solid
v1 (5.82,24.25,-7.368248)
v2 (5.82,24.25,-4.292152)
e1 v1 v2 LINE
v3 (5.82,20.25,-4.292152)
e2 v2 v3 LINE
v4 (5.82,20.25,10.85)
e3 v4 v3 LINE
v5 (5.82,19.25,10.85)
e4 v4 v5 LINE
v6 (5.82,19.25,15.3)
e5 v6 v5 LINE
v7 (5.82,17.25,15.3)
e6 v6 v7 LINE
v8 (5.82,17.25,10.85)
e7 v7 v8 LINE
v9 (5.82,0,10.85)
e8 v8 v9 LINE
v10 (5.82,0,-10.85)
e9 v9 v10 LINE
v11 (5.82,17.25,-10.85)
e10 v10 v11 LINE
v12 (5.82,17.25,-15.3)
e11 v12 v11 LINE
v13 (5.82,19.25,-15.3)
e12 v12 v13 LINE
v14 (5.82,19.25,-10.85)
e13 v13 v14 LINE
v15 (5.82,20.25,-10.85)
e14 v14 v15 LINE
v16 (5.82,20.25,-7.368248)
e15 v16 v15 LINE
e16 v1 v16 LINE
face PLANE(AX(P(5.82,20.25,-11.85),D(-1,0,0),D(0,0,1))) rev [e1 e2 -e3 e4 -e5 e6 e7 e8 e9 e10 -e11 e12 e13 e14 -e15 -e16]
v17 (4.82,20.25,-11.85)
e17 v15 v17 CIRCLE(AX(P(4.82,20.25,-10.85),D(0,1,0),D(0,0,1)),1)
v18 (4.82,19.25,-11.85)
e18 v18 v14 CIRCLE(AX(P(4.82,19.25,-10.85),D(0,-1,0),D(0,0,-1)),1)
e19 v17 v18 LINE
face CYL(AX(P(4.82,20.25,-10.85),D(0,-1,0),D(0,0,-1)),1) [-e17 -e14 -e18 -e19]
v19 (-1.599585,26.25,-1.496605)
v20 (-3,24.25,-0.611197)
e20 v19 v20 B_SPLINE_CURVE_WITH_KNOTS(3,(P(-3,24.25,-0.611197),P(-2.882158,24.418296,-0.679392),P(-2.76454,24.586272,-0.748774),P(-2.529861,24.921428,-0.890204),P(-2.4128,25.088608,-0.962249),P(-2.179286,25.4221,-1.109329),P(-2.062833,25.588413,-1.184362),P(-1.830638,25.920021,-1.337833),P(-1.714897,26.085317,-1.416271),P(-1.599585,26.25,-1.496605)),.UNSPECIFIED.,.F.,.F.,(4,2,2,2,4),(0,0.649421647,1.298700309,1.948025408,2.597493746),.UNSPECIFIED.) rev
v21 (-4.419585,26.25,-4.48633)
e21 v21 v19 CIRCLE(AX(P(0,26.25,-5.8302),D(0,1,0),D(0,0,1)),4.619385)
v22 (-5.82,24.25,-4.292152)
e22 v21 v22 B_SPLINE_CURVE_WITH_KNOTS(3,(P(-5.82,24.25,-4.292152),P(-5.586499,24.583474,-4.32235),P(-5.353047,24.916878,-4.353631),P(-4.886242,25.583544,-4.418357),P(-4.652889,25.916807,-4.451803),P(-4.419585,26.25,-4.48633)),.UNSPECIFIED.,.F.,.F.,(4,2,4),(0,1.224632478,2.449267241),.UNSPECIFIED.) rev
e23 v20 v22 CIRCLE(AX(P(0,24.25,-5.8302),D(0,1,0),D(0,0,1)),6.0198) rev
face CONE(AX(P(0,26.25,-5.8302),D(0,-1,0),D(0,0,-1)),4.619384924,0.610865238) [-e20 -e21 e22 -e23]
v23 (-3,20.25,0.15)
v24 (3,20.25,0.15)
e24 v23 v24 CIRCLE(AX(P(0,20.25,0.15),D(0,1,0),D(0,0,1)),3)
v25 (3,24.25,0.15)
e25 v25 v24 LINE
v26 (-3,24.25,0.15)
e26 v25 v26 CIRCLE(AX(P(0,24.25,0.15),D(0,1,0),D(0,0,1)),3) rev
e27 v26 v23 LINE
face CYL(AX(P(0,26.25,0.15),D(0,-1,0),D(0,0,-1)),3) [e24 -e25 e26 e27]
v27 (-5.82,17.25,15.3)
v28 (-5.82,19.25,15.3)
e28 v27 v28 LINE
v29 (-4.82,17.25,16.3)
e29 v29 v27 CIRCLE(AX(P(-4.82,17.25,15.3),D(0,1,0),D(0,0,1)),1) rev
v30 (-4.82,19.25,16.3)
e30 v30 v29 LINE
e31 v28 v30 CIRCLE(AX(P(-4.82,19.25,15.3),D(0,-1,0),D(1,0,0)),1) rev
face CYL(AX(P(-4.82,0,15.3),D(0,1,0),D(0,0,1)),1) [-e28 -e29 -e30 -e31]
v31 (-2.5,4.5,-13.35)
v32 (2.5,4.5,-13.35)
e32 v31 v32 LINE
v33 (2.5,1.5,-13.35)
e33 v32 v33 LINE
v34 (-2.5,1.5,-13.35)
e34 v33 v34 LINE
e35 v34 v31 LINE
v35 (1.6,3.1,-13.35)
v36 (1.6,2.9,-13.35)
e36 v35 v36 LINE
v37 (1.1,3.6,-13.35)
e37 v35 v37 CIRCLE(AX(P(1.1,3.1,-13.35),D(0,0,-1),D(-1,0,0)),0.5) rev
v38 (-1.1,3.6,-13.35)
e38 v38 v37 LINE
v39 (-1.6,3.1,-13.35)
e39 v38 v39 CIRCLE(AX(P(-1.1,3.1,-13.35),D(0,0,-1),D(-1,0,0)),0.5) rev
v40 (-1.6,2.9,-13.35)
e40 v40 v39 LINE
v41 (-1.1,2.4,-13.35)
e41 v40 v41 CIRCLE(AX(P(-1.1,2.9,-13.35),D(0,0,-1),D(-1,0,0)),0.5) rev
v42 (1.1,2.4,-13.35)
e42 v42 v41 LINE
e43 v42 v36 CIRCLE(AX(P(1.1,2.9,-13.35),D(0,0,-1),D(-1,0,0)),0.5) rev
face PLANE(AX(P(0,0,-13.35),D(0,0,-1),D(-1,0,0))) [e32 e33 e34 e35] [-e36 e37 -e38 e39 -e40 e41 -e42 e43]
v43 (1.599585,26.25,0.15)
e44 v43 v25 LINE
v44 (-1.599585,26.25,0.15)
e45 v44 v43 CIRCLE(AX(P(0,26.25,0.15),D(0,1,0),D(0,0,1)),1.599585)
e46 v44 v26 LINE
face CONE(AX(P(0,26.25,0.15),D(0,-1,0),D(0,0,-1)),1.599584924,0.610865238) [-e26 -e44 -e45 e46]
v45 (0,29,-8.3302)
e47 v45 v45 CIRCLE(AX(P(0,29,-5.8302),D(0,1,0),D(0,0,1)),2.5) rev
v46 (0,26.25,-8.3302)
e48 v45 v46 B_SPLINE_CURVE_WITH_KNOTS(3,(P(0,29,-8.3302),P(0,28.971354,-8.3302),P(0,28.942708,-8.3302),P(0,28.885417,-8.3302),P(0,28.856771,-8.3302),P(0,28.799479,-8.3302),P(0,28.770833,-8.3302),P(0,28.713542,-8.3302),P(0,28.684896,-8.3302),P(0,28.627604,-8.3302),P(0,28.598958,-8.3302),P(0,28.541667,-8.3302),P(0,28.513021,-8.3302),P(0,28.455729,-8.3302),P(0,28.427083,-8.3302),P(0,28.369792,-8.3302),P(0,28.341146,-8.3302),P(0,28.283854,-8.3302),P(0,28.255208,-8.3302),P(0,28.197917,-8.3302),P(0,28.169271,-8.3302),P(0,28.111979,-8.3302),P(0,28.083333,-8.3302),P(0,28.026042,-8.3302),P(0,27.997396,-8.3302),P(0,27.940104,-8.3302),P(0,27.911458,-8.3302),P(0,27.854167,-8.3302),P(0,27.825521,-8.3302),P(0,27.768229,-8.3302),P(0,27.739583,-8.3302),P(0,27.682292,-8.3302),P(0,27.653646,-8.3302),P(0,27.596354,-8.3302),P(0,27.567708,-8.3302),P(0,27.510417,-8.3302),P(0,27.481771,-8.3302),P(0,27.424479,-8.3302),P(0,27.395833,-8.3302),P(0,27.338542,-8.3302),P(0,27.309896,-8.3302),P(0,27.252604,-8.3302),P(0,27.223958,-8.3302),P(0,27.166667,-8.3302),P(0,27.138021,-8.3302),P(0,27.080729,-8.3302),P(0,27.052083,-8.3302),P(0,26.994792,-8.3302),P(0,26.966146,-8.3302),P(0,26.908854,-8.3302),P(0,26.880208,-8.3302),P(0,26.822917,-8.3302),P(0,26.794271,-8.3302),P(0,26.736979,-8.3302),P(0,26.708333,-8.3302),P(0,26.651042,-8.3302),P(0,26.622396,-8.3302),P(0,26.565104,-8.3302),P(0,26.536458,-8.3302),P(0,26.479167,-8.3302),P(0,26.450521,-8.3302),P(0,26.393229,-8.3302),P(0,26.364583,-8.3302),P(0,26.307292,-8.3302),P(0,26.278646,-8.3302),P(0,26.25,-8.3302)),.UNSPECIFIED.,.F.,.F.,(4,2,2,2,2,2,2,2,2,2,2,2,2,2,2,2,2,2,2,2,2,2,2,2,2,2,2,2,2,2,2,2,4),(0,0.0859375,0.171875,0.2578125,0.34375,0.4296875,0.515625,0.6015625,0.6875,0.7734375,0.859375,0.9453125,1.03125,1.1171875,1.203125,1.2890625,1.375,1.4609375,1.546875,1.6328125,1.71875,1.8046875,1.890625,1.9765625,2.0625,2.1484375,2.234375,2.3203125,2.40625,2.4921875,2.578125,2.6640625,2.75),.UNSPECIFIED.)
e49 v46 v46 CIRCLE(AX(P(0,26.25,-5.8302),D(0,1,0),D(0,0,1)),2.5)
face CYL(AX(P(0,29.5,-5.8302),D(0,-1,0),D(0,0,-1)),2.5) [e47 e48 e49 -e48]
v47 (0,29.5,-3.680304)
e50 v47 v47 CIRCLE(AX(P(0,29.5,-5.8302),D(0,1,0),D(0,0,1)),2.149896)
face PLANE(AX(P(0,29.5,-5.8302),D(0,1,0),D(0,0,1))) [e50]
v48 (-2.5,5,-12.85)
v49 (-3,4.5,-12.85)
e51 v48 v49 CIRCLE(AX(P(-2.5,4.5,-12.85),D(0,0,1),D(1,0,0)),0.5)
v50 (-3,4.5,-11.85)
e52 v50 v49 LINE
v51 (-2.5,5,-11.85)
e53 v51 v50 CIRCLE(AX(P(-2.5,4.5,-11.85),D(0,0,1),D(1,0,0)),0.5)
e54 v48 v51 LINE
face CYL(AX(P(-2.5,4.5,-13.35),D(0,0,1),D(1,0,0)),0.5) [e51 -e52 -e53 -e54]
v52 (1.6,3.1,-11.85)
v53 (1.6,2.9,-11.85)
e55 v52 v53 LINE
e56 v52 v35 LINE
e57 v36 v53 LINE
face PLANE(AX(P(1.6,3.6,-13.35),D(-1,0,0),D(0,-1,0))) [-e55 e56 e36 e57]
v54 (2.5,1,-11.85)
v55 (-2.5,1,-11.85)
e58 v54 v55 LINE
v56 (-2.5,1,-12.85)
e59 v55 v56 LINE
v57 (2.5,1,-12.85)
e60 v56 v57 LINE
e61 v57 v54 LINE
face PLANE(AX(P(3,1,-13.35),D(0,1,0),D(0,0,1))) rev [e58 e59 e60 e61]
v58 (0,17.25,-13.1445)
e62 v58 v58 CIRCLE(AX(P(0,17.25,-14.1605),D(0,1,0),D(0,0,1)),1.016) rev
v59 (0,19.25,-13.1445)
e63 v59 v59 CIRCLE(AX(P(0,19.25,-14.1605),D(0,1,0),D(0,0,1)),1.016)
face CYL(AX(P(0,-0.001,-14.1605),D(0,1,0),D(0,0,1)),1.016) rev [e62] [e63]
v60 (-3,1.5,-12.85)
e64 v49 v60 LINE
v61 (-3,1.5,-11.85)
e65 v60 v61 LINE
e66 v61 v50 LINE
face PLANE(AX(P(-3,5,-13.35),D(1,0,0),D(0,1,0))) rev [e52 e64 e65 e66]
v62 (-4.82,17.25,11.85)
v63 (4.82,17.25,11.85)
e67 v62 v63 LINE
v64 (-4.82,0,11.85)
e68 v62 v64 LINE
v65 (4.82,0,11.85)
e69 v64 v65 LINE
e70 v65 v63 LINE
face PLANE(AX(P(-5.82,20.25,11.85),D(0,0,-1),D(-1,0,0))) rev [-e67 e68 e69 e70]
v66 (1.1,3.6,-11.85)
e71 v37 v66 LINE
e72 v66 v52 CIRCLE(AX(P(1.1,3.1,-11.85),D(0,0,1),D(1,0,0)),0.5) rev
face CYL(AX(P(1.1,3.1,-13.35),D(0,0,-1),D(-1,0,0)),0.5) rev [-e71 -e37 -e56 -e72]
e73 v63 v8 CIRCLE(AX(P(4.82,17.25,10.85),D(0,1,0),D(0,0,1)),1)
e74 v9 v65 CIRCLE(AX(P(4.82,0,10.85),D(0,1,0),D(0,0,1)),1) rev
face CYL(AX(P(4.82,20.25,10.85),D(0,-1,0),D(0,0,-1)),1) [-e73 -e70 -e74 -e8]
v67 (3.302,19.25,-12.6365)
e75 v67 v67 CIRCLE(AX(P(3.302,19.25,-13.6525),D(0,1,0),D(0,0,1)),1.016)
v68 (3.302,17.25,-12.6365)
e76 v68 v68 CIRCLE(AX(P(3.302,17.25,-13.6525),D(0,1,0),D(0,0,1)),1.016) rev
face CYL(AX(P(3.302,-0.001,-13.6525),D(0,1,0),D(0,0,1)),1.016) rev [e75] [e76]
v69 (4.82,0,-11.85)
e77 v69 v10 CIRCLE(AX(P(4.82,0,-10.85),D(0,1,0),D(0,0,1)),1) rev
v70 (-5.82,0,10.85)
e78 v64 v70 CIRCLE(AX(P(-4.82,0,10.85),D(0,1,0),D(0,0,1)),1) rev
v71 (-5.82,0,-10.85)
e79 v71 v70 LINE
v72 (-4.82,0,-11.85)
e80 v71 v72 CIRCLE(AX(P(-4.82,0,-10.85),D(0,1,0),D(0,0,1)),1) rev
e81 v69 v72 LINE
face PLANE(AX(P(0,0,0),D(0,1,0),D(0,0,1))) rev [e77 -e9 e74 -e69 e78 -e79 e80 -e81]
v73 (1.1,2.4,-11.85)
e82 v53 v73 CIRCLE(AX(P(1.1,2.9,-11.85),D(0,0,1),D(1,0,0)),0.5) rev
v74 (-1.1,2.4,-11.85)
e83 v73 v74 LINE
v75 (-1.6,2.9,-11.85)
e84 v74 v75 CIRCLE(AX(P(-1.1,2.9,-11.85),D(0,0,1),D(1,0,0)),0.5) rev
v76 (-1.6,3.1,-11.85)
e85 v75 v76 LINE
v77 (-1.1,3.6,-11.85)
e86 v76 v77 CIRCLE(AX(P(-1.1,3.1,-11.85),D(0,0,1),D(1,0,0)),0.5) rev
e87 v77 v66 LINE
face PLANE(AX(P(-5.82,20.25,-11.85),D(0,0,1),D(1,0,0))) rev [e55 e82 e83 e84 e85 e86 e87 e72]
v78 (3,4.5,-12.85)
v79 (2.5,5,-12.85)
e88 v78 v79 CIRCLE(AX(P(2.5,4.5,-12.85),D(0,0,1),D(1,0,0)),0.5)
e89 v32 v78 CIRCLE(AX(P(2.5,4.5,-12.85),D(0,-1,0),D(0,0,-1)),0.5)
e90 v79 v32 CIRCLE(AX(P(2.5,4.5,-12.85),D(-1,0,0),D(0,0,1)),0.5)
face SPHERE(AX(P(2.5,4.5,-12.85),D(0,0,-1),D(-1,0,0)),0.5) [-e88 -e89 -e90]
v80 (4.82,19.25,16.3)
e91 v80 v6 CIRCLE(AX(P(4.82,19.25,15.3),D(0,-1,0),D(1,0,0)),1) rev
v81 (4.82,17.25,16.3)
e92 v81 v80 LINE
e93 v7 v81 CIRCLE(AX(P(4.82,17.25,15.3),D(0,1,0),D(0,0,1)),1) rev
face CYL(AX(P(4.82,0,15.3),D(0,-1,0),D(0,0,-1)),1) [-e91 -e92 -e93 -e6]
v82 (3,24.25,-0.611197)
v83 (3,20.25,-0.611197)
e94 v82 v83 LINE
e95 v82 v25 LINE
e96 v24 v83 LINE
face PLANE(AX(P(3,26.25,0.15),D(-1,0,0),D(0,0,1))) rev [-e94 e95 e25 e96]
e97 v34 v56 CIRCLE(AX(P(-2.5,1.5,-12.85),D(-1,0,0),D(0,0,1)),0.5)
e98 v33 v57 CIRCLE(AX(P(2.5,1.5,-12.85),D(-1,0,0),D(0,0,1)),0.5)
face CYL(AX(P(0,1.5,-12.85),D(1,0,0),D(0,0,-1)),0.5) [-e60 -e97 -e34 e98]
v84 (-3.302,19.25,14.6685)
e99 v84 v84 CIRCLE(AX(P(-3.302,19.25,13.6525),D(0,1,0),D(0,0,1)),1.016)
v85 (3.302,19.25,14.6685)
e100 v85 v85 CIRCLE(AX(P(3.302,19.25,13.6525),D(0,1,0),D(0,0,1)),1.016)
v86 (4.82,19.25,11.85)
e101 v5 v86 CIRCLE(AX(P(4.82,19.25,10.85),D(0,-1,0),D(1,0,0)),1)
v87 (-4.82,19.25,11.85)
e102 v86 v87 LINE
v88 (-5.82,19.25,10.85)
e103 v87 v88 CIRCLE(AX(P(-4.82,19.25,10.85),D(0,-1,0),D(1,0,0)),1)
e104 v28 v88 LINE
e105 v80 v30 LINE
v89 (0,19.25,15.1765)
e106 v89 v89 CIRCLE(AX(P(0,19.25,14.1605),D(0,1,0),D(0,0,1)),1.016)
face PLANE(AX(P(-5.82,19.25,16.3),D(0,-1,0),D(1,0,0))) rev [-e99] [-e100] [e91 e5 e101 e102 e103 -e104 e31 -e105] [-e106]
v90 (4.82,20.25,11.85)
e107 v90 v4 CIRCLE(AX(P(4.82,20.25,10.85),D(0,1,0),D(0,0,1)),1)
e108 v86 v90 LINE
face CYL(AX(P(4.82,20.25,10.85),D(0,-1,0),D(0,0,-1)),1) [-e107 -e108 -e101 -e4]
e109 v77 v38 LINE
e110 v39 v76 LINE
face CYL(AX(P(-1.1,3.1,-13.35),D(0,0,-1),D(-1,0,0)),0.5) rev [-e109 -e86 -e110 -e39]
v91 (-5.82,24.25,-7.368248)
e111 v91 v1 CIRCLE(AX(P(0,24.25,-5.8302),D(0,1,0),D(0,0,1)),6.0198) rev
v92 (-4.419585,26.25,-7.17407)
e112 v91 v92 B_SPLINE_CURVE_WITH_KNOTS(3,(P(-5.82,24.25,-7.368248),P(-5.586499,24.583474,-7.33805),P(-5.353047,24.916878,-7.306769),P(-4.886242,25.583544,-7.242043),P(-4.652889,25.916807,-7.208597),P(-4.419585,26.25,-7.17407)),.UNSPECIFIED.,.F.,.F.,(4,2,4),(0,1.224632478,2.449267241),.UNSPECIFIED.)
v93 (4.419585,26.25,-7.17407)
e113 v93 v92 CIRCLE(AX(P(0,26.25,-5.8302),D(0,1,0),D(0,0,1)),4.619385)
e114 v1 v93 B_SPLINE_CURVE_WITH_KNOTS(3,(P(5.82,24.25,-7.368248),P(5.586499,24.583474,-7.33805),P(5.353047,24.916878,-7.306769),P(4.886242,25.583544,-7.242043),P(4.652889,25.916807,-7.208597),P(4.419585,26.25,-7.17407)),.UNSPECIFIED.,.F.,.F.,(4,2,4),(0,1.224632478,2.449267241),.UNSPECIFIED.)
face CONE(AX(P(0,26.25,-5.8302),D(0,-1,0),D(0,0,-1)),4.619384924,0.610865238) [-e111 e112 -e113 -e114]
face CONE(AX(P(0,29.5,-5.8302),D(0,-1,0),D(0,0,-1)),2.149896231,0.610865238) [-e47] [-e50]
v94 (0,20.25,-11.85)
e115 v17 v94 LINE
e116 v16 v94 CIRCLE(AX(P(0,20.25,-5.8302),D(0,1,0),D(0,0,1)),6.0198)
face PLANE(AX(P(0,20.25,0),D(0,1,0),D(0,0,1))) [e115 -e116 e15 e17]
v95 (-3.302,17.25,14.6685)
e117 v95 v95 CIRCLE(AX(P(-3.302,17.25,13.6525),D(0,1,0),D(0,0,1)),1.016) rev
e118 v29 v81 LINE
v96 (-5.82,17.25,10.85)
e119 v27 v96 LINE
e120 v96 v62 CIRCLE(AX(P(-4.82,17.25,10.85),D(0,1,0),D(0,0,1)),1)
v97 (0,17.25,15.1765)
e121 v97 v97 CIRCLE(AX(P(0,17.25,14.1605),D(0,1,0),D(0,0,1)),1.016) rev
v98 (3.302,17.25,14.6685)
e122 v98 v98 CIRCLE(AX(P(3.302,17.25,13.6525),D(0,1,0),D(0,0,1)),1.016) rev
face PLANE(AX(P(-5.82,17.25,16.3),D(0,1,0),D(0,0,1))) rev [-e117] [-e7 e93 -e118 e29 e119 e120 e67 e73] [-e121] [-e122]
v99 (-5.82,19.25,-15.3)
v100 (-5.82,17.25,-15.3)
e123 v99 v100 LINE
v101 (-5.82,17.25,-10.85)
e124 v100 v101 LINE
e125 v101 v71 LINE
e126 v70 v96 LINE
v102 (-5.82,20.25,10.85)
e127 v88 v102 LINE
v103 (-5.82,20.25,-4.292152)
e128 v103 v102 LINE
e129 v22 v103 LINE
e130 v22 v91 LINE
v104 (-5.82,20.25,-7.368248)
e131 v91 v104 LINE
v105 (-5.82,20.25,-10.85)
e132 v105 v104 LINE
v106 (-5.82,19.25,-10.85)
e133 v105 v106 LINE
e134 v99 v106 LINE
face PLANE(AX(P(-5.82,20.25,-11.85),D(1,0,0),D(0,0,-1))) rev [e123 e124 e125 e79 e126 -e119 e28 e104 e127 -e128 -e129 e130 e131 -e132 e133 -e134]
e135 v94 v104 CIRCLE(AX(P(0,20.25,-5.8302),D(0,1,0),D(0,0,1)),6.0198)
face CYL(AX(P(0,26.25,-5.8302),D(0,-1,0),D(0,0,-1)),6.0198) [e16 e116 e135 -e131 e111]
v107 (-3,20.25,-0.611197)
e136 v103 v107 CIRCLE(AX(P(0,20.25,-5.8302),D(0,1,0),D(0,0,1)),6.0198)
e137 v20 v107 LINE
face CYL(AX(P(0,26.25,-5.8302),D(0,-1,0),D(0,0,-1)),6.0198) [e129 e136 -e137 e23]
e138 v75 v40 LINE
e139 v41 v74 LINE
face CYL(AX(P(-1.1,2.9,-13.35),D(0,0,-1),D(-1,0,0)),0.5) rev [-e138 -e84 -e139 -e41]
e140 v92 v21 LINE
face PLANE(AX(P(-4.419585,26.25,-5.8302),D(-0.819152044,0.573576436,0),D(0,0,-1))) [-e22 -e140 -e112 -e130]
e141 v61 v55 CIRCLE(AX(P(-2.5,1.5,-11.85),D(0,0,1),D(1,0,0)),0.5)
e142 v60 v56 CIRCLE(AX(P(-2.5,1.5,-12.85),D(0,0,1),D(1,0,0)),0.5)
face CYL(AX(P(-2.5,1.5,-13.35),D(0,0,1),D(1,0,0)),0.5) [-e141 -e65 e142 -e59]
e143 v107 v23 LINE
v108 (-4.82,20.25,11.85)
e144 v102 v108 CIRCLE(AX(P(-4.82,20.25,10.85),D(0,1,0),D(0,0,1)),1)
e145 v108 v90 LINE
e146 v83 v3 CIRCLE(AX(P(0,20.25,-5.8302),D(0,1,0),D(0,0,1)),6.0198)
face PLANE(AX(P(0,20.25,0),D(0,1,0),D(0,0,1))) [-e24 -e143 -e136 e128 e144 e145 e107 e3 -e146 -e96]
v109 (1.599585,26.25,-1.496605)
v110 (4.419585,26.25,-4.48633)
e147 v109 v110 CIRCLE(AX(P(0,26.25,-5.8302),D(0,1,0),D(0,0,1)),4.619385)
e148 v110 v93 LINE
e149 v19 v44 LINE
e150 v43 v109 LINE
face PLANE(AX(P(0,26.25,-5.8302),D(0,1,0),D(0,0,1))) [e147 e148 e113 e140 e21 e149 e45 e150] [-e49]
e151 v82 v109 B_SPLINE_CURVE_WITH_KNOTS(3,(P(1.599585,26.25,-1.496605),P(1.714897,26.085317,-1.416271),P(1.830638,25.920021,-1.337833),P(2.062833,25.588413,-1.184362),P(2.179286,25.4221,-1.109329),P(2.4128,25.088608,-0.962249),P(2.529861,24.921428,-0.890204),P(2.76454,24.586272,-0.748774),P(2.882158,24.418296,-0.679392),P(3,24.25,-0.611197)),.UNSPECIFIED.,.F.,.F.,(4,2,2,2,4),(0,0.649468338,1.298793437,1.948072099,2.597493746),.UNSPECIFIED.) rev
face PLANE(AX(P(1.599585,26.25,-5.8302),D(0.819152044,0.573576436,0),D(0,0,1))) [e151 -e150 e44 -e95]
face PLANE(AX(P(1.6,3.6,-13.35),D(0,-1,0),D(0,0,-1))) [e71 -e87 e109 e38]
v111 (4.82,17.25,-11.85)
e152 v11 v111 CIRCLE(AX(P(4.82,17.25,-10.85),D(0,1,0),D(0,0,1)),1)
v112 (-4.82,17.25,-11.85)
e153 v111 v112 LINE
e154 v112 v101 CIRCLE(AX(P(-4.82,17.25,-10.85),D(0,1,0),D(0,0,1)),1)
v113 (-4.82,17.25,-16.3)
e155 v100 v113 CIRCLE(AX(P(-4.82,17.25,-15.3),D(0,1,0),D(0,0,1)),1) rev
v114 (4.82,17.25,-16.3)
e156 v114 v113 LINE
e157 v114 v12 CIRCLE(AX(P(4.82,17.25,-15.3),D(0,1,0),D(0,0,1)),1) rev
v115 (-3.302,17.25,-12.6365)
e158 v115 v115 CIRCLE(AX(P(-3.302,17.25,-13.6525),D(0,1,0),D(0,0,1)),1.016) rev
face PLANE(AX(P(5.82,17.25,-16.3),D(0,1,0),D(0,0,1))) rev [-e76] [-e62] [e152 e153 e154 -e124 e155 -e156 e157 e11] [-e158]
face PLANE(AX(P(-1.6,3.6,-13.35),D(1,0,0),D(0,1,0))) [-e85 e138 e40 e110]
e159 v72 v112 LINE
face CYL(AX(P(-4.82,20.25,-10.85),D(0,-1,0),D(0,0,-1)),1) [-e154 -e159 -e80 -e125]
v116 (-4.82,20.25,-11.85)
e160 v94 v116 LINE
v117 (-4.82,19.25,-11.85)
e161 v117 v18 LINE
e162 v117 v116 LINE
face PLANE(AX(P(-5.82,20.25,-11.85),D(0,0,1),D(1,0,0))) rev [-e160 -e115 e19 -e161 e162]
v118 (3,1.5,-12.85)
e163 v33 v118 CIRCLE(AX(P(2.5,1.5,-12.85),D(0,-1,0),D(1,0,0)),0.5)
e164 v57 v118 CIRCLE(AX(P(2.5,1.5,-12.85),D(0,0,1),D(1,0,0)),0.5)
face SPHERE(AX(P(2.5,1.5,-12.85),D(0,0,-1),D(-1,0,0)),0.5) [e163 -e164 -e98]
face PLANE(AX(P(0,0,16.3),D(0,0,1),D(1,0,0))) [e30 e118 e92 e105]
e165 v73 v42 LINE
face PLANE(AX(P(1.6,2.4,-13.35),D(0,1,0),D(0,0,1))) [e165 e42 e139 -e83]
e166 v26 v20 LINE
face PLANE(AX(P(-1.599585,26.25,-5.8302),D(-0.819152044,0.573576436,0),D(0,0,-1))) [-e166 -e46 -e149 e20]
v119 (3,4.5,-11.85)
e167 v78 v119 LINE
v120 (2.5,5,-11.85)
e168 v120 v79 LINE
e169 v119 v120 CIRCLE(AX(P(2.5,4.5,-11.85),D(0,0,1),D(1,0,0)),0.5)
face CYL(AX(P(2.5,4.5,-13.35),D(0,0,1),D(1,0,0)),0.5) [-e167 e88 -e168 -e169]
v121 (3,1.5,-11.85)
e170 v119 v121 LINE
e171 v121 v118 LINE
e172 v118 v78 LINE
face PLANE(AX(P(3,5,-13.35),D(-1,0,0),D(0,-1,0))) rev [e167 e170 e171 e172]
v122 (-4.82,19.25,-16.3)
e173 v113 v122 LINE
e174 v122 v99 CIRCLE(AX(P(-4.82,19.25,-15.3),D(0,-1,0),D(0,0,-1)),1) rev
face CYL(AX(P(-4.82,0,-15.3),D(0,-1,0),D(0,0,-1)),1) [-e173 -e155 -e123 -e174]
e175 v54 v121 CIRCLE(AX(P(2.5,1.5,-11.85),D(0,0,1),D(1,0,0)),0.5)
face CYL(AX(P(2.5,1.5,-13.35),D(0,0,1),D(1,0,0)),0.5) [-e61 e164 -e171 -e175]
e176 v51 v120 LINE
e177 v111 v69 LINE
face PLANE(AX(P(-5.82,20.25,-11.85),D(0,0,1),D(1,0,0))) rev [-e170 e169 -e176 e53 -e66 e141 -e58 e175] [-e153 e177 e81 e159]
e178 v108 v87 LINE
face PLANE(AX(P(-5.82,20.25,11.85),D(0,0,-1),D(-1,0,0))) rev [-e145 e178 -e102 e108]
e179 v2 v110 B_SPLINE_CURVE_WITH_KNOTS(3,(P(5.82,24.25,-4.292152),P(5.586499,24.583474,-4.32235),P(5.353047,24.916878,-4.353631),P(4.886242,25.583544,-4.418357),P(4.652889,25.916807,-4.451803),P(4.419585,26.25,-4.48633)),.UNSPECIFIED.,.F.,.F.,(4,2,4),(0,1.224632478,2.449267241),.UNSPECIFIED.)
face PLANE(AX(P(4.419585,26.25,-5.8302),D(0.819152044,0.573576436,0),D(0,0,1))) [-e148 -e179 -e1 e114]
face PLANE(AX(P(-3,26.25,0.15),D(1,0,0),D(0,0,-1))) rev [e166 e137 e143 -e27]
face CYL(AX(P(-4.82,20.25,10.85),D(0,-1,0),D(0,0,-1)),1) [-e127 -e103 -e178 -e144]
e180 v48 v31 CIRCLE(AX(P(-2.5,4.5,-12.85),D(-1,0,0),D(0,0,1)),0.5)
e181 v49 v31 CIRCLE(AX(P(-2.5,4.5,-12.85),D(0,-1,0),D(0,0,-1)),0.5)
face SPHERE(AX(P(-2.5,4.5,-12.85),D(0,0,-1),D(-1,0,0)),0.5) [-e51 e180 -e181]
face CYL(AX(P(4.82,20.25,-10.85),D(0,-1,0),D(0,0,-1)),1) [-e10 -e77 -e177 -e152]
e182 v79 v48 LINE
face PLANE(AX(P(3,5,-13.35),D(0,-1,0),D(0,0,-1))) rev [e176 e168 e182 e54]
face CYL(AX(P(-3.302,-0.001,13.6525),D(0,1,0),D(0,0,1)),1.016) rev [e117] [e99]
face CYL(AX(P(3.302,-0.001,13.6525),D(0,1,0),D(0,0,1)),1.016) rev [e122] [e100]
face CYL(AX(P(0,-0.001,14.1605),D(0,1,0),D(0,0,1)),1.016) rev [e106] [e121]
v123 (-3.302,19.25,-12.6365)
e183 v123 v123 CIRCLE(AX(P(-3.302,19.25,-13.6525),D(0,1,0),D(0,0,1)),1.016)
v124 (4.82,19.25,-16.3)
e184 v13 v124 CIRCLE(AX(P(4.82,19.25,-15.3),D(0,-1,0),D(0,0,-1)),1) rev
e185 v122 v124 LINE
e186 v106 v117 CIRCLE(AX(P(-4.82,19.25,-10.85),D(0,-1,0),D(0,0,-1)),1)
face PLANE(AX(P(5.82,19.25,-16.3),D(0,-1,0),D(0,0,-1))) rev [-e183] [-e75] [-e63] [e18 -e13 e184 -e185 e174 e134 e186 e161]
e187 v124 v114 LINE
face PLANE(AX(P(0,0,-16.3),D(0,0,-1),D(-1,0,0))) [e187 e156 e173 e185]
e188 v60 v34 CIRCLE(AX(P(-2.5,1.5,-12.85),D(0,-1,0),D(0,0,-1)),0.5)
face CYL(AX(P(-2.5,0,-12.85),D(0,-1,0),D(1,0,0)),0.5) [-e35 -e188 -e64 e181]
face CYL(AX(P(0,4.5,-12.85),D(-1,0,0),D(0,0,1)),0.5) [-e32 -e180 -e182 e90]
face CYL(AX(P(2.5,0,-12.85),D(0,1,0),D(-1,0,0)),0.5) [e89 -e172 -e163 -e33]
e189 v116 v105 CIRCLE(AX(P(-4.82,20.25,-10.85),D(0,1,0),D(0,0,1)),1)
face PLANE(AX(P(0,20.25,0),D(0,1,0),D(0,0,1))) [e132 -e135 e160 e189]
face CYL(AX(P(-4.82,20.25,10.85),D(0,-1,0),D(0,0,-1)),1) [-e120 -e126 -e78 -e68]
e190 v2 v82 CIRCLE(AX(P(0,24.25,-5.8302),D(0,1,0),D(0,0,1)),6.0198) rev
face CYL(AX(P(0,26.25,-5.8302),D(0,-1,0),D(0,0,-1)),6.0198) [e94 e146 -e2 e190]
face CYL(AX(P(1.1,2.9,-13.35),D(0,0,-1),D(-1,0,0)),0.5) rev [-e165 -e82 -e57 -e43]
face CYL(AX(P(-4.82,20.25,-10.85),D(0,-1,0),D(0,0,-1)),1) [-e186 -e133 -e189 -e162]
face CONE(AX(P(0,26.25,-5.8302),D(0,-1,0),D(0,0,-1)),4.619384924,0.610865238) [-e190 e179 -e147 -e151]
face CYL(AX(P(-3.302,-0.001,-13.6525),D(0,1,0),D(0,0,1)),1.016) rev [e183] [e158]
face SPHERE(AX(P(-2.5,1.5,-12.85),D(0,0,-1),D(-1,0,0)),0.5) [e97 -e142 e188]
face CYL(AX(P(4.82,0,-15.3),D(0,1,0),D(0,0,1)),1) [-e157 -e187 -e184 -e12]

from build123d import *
from OCP.BRepFilletAPI import BRepFilletAPI_MakeChamfer

# Parameters (mm, degrees)
SKETCH1_W           = 11.64
SKETCH1_H           = 23.7
BOSS_EXTRUDE1_DEPTH = 20.25
SKETCH2_W           = 11.64
SKETCH2_H           = 2
BOSS_EXTRUDE2_DEPTH = 4.45
SKETCH3_W           = 11.64
SKETCH3_H           = 2
BOSS_EXTRUDE3_DEPTH = 4.45
FILLET1_R           = 1
BOSS_EXTRUDE4_DEPTH = 6
CHAMFER2_SIZE2      = 1.400415076
CHAMFER2_SIZE       = 2
SKETCH5_R           = 2.5
BOSS_EXTRUDE5_DEPTH = 3.25
SKETCH6_W           = 6
SKETCH6_H           = 4
SKETCH6_W_2         = 3.2
SKETCH6_H_2         = 1.2
BOSS_EXTRUDE6_DEPTH = 1.5
FILLET2_R           = 0.5
CHAMFER3_SIZE       = 0.5
CHAMFER3_SIZE2      = 0.350103769
CUT_EXTRUDE1_REACH  = 27.887
SKETCH7_R           = 1.016
FILLET3_R           = 0.5


with BuildPart() as part:
    # Sketch1 → Boss-Extrude1 (new body)
    with BuildSketch(Plane(origin=(0, 0, 0), x_dir=(1, 0, 0), z_dir=(0, 1, 0))):
        Rectangle(SKETCH1_W, SKETCH1_H)
    extrude(amount=BOSS_EXTRUDE1_DEPTH)

    # Sketch2 → Boss-Extrude2 (add)
    with BuildSketch(Plane.XY.offset(11.85)):
        with Locations((0, 18.25)):
            Rectangle(SKETCH2_W, SKETCH2_H)
    extrude(amount=BOSS_EXTRUDE2_DEPTH)

    # Sketch3 → Boss-Extrude3 (add)
    with BuildSketch(Plane(origin=(0, 0, -11.85), x_dir=(-1, 0, 0), z_dir=(0, 0, -1))):
        with Locations((0, 18.25)):
            Rectangle(SKETCH3_W, SKETCH3_H)
    extrude(amount=BOSS_EXTRUDE3_DEPTH)

    # Fillet1
    fillet1_edges = [part.edges().sort_by_distance(p)[0] for p in [
        (5.82, 8.625, 11.85),
        (-5.82, 8.625, 11.85),
        (5.82, 18.25, 16.3),
        (-5.82, 18.25, 16.3),
        (-5.82, 8.625, -11.85),
        (5.82, 8.625, -11.85),
        (-5.82, 18.25, -16.3),
        (5.82, 18.25, -16.3),
        (5.82, 19.75, 11.85),
        (-5.82, 19.75, 11.85),
        (-5.82, 19.75, -11.85),
        (5.82, 19.75, -11.85),
    ]]
    fillet(fillet1_edges, radius=FILLET1_R)

    # Sketch4 → Boss-Extrude4 (add)
    with BuildSketch(Plane(origin=(0, 20.25, 0), x_dir=(1, 0, 0), z_dir=(0, 1, 0))):
        with BuildLine():
            Line((-3, -0.15), (-3, 0.611197026))
            ThreePointArc((-3, 0.611197026), (-4.778645953, 2.169252733), (-5.82, 4.292151873))
            Line((-5.82, 4.292151873), (-5.82, 7.368248127))
            ThreePointArc((-5.82, 7.368248127), (0, 11.85), (5.82, 7.368248127))
            Line((5.82, 7.368248127), (5.82, 4.292151873))
            ThreePointArc((5.82, 4.292151873), (4.778645953, 2.169252733), (3, 0.611197026))
            Line((3, 0.611197026), (3, -0.15))
            ThreePointArc((3, -0.15), (0, -3.15), (-3, -0.15))
        make_face()
    extrude(amount=BOSS_EXTRUDE4_DEPTH)

    # Chamfer2
    chamfer2_edges = [part.edges().sort_by_distance(p)[0] for p in [
        (-5.82, 26.25, -5.8302),
    ]]
    chamfer2_side = [part.faces().sort_by_distance(p)[0] for p in [
        (-5.82, 26.221991698, -5.8302),
    ]]
    chamfer(chamfer2_edges, length=CHAMFER2_SIZE, length2=CHAMFER2_SIZE2, reference=chamfer2_side[0])
    chamfer2_2_edges = [part.edges().sort_by_distance(p)[0] for p in [
        (5.82, 26.25, -5.8302),
    ]]
    chamfer2_2_side = [part.faces().sort_by_distance(p)[0] for p in [
        (5.791991698, 26.25, -5.8302),
    ]]
    chamfer(chamfer2_2_edges, length=CHAMFER2_SIZE2, length2=CHAMFER2_SIZE, reference=chamfer2_2_side[0])
    chamfer2_3_edges = [part.edges().sort_by_distance(p)[0] for p in [
        (3.752705775, 26.25, -1.123269853),
    ]]
    chamfer2_3_side = [part.faces().sort_by_distance(p)[0] for p in [
        (3.735245575, 26.25, -1.14516977),
    ]]
    chamfer(chamfer2_3_edges, length=CHAMFER2_SIZE2, length2=CHAMFER2_SIZE, reference=chamfer2_3_side[0])
    chamfer2_4_edges = [part.edges().sort_by_distance(p)[0] for p in [
        (-3.752705775, 26.25, -1.123269853),
    ]]
    chamfer2_4_side = [part.faces().sort_by_distance(p)[0] for p in [
        (-3.735245575, 26.25, -1.14516977),
    ]]
    chamfer(chamfer2_4_edges, length=CHAMFER2_SIZE2, length2=CHAMFER2_SIZE, reference=chamfer2_4_side[0])
    chamfer2_5_edges_1 = [part.edges().sort_by_distance(p)[0] for p in [
        (3, 26.25, -0.230598513),
    ]]
    chamfer2_5_side_1 = [part.faces().sort_by_distance(p)[0] for p in [
        (2.971991698, 26.25, -0.230598513),
    ]]
    chamfer2_5_edges_2 = [part.edges().sort_by_distance(p)[0] for p in [
        (0, 26.25, 3.15),
    ]]
    chamfer2_5_side_2 = [part.faces().sort_by_distance(p)[0] for p in [
        (0, 26.25, 3.121991698),
    ]]
    chamfer2_5_edges_3 = [part.edges().sort_by_distance(p)[0] for p in [
        (-3, 26.25, -0.230598513),
    ]]
    chamfer2_5_side_3 = [part.faces().sort_by_distance(p)[0] for p in [
        (-2.971991698, 26.25, -0.230598513),
    ]]
    chamfer2_5 = BRepFilletAPI_MakeChamfer(part.part.solid().wrapped)
    for e in chamfer2_5_edges_1:
        chamfer2_5.Add(CHAMFER2_SIZE2, CHAMFER2_SIZE, e.wrapped, chamfer2_5_side_1[0].wrapped)
    for e in chamfer2_5_edges_2:
        chamfer2_5.Add(CHAMFER2_SIZE2, CHAMFER2_SIZE, e.wrapped, chamfer2_5_side_2[0].wrapped)
    for e in chamfer2_5_edges_3:
        chamfer2_5.Add(CHAMFER2_SIZE2, CHAMFER2_SIZE, e.wrapped, chamfer2_5_side_3[0].wrapped)
    add(Compound.cast(chamfer2_5.Shape()), mode=Mode.REPLACE)
    chamfer2_6_edges = [part.edges().sort_by_distance(p)[0] for p in [
        (0, 26.25, -11.85),
    ]]
    chamfer2_6_side = [part.faces().sort_by_distance(p)[0] for p in [
        (0, 26.25, -11.821991698),
    ]]
    chamfer(chamfer2_6_edges, length=CHAMFER2_SIZE2, length2=CHAMFER2_SIZE, reference=chamfer2_6_side[0])

    # Sketch5 → Boss-Extrude5 (add)
    with BuildSketch(Plane(origin=(0, 26.25, 0), x_dir=(1, 0, 0), z_dir=(0, 1, 0))):
        with Locations(Location((0, 5.8302, 0), (0, 0, 90))):
            Circle(SKETCH5_R)
    extrude(amount=BOSS_EXTRUDE5_DEPTH)

    # Sketch6 → Boss-Extrude6 (add)
    with BuildSketch(Plane(origin=(0, 0, -11.85), x_dir=(-1, 0, 0), z_dir=(0, 0, -1))):
        with Locations((0, 3)):
            Rectangle(SKETCH6_W, SKETCH6_H)
        with Locations((0, 3)):
            Rectangle(SKETCH6_W_2, SKETCH6_H_2, mode=Mode.SUBTRACT)
    extrude(amount=BOSS_EXTRUDE6_DEPTH)

    # Fillet2
    fillet2_edges = [part.edges().sort_by_distance(p)[0] for p in [
        (-3, 1, -12.6),
        (-3, 5, -12.6),
        (3, 5, -12.6),
        (3, 1, -12.6),
        (1.6, 3.6, -12.6),
        (1.6, 2.4, -12.6),
        (-1.6, 2.4, -12.6),
        (-1.6, 3.6, -12.6),
    ]]
    fillet(fillet2_edges, radius=FILLET2_R)

    # Chamfer3
    chamfer3_edges = [part.edges().sort_by_distance(p)[0] for p in [
        (0, 29.5, -3.3302),
    ]]
    chamfer3_side = [part.faces().sort_by_distance(p)[0] for p in [
        (0, 27.875, -3.3302),
    ]]
    chamfer(chamfer3_edges, length=CHAMFER3_SIZE, length2=CHAMFER3_SIZE2, reference=chamfer3_side[0])

    # Sketch7 → Cut-Extrude1 (cut, up to next)
    with BuildSketch(Plane(origin=(0, 19.25, 0), x_dir=(1, 0, 0), z_dir=(0, 1, 0)), mode=Mode.PRIVATE) as cut_extrude1_sk1:
        with Locations(Location((0, -14.1605, 0), (0, 0, 270))):
            Circle(SKETCH7_R)
    cut_extrude1_tool1 = extrude(cut_extrude1_sk1.sketch, amount=-CUT_EXTRUDE1_REACH, mode=Mode.PRIVATE) & part.part
    # Sketch7 → Cut-Extrude1 (cut, up to next)
    with BuildSketch(Plane(origin=(0, 19.25, 0), x_dir=(1, 0, 0), z_dir=(0, 1, 0)), mode=Mode.PRIVATE) as cut_extrude1_sk2:
        with Locations(Location((0, 14.1605, 0), (0, 0, 270))):
            Circle(SKETCH7_R)
    cut_extrude1_tool2 = extrude(cut_extrude1_sk2.sketch, amount=-CUT_EXTRUDE1_REACH, mode=Mode.PRIVATE) & part.part
    # Sketch7 → Cut-Extrude1 (cut, up to next)
    with BuildSketch(Plane(origin=(0, 19.25, 0), x_dir=(1, 0, 0), z_dir=(0, 1, 0)), mode=Mode.PRIVATE) as cut_extrude1_sk3:
        with Locations(Location((-3.302, 13.6525, 0), (0, 0, 270))):
            Circle(SKETCH7_R)
    cut_extrude1_tool3 = extrude(cut_extrude1_sk3.sketch, amount=-CUT_EXTRUDE1_REACH, mode=Mode.PRIVATE) & part.part
    # Sketch7 → Cut-Extrude1 (cut, up to next)
    with BuildSketch(Plane(origin=(0, 19.25, 0), x_dir=(1, 0, 0), z_dir=(0, 1, 0)), mode=Mode.PRIVATE) as cut_extrude1_sk4:
        with Locations(Location((3.302, 13.6525, 0), (0, 0, 270))):
            Circle(SKETCH7_R)
    cut_extrude1_tool4 = extrude(cut_extrude1_sk4.sketch, amount=-CUT_EXTRUDE1_REACH, mode=Mode.PRIVATE) & part.part
    # Sketch7 → Cut-Extrude1 (cut, up to next)
    with BuildSketch(Plane(origin=(0, 19.25, 0), x_dir=(1, 0, 0), z_dir=(0, 1, 0)), mode=Mode.PRIVATE) as cut_extrude1_sk5:
        with Locations(Location((-3.302, -13.6525, 0), (0, 0, 270))):
            Circle(SKETCH7_R)
    cut_extrude1_tool5 = extrude(cut_extrude1_sk5.sketch, amount=-CUT_EXTRUDE1_REACH, mode=Mode.PRIVATE) & part.part
    # Sketch7 → Cut-Extrude1 (cut, up to next)
    with BuildSketch(Plane(origin=(0, 19.25, 0), x_dir=(1, 0, 0), z_dir=(0, 1, 0)), mode=Mode.PRIVATE) as cut_extrude1_sk6:
        with Locations(Location((3.302, -13.6525, 0), (0, 0, 270))):
            Circle(SKETCH7_R)
    cut_extrude1_tool6 = extrude(cut_extrude1_sk6.sketch, amount=-CUT_EXTRUDE1_REACH, mode=Mode.PRIVATE) & part.part
    add(cut_extrude1_tool1.solids().sort_by_distance((0, 19.25, 14.1605))[0], mode=Mode.SUBTRACT)
    add(cut_extrude1_tool2.solids().sort_by_distance((0, 19.25, -14.1605))[0], mode=Mode.SUBTRACT)
    add(cut_extrude1_tool3.solids().sort_by_distance((-3.302, 19.25, -13.6525))[0], mode=Mode.SUBTRACT)
    add(cut_extrude1_tool4.solids().sort_by_distance((3.302, 19.25, -13.6525))[0], mode=Mode.SUBTRACT)
    add(cut_extrude1_tool5.solids().sort_by_distance((-3.302, 19.25, 13.6525))[0], mode=Mode.SUBTRACT)
    add(cut_extrude1_tool6.solids().sort_by_distance((3.302, 19.25, 13.6525))[0], mode=Mode.SUBTRACT)

    # Fillet3
    fillet3_edges = [part.edges().sort_by_distance(p)[0] for p in [
        (0, 1, -13.35),
        (3, 3, -13.35),
        (-3, 3, -13.35),
        (0, 5, -13.35),
        (2.853553391, 4.853553391, -13.35),
        (-2.853553391, 4.853553391, -13.35),
        (-2.853553391, 1.146446609, -13.35),
        (2.853553391, 1.146446609, -13.35),
    ]]
    fillet(fillet3_edges, radius=FILLET3_R)


solid = part.part
